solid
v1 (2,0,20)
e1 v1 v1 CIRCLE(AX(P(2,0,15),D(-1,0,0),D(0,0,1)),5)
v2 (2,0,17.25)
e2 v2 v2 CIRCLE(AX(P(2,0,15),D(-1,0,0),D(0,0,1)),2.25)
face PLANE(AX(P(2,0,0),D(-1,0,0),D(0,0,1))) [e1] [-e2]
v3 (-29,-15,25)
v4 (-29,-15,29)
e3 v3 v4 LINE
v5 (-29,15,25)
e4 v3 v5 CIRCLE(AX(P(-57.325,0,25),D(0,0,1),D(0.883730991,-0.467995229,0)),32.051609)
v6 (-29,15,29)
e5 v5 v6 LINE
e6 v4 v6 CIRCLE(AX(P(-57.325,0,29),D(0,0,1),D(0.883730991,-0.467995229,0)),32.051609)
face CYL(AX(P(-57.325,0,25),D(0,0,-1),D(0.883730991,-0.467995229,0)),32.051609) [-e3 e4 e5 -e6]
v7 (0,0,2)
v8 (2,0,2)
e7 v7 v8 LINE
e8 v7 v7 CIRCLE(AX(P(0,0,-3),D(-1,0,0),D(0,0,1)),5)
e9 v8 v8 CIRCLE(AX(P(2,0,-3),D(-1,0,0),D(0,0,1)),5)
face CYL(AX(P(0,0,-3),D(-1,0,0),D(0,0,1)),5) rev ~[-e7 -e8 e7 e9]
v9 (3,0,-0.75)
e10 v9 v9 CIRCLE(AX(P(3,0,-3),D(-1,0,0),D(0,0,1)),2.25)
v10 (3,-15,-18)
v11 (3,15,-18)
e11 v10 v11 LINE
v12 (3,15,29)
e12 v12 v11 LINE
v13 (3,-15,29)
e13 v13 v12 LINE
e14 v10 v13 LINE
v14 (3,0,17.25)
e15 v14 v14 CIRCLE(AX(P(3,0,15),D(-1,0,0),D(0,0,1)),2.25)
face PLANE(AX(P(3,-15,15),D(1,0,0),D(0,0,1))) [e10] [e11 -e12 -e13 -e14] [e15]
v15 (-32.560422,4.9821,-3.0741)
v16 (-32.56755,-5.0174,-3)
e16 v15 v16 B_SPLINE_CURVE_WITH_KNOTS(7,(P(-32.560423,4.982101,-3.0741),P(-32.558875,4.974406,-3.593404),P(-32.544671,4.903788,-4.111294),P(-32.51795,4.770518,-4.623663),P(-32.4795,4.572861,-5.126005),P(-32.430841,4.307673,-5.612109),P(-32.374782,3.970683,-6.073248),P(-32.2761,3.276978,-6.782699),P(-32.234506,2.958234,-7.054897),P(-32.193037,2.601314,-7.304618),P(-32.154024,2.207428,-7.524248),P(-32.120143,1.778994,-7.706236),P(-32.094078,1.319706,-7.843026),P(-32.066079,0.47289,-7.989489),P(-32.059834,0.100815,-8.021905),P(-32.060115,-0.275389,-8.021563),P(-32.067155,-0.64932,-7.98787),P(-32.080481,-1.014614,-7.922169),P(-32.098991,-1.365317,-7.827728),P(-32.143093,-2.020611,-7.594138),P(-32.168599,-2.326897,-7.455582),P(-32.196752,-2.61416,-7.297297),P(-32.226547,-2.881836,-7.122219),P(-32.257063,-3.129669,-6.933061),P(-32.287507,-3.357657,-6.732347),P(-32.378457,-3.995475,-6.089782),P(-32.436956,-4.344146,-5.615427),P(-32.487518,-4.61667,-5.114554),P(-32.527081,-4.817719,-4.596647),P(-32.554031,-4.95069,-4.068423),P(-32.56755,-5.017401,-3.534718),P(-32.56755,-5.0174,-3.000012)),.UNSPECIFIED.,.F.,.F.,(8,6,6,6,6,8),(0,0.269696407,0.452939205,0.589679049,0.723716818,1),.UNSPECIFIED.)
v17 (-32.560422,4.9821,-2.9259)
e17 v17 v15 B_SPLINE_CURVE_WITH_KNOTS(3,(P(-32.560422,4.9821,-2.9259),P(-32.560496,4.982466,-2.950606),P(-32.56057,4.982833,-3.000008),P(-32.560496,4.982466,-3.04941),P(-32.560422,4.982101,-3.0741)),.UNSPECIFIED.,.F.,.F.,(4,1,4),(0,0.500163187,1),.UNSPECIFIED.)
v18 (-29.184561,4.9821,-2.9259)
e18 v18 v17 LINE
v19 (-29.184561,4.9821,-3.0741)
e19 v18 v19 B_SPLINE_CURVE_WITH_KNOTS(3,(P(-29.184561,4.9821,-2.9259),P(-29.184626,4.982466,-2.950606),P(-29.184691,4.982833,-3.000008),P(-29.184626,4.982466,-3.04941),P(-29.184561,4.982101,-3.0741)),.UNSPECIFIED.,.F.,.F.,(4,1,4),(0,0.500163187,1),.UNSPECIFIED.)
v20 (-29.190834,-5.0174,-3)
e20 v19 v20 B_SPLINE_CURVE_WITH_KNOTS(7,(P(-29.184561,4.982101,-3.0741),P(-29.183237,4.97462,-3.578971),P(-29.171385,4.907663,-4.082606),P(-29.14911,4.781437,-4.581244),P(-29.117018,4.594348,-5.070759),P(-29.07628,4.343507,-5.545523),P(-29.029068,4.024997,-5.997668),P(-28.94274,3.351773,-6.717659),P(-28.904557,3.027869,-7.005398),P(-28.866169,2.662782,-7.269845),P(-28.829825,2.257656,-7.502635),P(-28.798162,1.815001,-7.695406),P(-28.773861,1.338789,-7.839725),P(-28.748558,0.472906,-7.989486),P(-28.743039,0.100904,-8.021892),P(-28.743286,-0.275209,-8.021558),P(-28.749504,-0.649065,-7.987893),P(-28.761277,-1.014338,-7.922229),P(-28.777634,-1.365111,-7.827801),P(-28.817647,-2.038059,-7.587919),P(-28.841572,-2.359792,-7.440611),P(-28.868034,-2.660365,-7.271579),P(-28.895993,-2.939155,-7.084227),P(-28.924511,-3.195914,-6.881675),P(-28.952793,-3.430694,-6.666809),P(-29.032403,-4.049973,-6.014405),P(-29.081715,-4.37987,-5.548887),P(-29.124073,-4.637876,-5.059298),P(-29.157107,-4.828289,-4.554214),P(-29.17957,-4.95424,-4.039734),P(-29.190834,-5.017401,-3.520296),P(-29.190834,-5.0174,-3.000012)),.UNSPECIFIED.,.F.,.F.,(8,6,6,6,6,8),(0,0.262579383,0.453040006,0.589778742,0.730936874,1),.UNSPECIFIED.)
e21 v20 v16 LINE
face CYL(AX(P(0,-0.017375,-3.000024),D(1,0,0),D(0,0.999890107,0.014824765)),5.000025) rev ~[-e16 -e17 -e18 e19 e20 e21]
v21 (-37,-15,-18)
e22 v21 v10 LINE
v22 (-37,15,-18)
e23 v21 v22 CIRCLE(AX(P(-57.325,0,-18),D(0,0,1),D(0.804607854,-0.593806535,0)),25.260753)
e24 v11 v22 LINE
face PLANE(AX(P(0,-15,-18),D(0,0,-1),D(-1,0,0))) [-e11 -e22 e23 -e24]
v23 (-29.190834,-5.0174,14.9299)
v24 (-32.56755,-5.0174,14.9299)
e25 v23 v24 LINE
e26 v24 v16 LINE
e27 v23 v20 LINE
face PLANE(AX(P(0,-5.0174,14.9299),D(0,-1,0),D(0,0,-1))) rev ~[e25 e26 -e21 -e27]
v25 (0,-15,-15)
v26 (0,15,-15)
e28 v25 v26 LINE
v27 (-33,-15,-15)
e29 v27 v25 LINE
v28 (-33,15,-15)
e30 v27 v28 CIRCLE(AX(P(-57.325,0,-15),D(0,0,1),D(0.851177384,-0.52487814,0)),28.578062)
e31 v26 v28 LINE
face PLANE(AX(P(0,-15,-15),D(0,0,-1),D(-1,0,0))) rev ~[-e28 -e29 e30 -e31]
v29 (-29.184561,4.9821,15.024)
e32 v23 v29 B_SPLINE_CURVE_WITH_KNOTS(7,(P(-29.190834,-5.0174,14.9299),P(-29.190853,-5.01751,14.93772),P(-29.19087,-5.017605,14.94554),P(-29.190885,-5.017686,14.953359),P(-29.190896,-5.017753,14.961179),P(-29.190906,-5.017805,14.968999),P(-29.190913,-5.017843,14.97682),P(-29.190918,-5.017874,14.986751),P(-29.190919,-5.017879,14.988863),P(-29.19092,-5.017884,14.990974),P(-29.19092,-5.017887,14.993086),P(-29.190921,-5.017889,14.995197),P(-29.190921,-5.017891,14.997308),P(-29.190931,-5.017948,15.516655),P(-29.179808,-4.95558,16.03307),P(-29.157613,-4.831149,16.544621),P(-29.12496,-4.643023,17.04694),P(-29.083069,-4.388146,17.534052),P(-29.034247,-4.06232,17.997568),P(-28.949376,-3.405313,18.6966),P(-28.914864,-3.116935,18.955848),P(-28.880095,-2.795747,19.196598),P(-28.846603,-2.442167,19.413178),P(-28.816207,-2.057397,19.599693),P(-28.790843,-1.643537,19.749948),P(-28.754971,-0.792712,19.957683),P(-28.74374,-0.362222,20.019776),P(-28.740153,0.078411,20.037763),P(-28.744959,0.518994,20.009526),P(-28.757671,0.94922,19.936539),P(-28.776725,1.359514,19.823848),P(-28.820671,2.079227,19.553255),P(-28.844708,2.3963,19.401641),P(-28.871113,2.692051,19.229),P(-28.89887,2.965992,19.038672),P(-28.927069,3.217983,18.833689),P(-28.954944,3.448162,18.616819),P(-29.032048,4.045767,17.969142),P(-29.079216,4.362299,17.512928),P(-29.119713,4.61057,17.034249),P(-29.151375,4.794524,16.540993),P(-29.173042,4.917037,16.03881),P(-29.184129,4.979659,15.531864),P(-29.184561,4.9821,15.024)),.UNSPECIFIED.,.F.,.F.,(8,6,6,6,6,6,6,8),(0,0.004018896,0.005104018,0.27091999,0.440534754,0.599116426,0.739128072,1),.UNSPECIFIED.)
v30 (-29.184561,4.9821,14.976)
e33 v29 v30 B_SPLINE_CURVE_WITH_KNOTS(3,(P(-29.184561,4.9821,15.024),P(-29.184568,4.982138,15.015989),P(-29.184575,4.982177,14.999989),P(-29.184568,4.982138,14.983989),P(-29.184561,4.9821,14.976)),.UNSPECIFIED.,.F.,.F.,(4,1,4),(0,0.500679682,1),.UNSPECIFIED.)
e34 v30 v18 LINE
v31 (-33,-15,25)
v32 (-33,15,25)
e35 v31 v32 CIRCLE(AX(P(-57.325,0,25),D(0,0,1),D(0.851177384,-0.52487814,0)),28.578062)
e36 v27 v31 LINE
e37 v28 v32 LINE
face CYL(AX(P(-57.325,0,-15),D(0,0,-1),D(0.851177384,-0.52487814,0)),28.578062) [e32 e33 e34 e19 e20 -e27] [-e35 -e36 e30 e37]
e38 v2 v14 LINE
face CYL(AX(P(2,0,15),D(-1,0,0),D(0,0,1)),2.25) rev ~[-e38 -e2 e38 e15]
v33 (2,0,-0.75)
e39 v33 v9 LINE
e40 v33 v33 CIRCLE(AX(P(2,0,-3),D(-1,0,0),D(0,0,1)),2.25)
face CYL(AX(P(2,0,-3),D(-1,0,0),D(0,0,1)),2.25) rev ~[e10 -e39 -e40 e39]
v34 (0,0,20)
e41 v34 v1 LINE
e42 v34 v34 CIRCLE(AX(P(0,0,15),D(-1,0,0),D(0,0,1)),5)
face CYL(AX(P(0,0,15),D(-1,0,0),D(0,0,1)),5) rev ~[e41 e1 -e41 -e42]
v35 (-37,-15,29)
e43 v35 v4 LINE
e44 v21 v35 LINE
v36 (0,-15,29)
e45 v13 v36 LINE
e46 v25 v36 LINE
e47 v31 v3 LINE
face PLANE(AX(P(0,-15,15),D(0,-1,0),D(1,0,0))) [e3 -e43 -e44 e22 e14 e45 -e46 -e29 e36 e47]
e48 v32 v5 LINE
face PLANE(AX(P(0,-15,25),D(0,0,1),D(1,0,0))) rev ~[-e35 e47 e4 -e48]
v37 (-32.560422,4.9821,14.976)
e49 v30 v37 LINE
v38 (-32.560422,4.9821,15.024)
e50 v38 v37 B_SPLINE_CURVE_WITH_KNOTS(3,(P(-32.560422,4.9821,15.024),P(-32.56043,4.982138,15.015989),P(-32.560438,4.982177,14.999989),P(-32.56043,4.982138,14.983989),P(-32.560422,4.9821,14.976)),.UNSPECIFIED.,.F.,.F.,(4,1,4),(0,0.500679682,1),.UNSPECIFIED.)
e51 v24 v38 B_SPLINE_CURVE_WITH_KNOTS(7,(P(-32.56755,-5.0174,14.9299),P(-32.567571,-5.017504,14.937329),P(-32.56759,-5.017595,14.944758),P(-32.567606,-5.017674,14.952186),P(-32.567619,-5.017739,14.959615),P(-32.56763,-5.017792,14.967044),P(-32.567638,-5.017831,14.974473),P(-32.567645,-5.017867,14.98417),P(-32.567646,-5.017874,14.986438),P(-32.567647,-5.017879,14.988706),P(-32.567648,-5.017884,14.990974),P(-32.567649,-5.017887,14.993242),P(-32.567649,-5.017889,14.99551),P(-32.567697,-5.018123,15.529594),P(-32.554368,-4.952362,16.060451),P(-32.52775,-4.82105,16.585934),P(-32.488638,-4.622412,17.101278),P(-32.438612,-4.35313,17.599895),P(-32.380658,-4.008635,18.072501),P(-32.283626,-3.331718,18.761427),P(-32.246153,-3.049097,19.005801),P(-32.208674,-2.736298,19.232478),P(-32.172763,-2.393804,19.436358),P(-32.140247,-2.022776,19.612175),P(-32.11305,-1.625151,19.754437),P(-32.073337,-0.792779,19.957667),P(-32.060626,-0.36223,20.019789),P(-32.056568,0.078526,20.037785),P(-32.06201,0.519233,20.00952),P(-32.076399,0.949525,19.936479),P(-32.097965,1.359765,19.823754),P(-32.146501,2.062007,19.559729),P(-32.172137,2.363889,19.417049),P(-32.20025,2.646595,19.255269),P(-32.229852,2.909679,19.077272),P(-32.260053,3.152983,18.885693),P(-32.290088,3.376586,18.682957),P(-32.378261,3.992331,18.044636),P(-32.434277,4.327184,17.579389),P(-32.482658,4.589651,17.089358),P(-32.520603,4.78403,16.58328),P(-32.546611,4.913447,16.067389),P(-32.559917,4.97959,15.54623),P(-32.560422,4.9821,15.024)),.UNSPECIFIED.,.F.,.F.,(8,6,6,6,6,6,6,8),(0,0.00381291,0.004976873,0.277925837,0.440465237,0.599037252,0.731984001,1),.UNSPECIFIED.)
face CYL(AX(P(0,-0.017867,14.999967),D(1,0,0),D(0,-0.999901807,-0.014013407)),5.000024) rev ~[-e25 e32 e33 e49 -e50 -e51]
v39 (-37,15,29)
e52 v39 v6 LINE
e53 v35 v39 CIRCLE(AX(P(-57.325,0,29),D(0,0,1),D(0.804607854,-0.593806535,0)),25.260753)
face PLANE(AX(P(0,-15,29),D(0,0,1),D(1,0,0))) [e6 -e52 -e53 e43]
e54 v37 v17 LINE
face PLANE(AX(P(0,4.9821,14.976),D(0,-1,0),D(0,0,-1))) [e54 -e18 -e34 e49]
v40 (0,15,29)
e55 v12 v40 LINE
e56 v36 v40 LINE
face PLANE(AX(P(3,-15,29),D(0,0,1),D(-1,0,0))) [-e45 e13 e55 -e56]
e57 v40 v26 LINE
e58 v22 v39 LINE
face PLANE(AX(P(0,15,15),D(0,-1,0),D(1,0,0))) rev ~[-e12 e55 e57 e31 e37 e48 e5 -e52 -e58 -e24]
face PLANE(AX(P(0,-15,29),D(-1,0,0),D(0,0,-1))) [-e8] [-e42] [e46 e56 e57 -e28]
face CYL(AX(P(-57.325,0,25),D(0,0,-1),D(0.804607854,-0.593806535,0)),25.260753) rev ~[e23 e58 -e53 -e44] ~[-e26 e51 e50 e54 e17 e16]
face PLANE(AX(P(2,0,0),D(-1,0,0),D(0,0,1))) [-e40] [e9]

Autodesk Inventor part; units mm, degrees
ref_plane "YZ Plane" through (0, 0, 0) normal (1, 0, 0) x (0, 1, 0)
ref_plane "XZ Plane" through (0, 0, 0) normal (0, 1, 0) x (-1, 0, 0)
ref_plane "XY Plane" through (0, 0, 0) normal (0, 0, 1) x (1, 0, 0)
sketch "Sketch1" plane through (0, 0, 0) normal (1, 0, 0) x (0, 1, 0)
  line L0 (-15, -15) -> (15, -15)
  line L1 (15, -15) -> (15, 15)
  line L2 (15, 15) -> (-15, 15)
  line L3 (-15, 15) -> (-15, -15)
  line L4 (-15, -15) -> (15, 15) construction
  line L5 (15, -15) -> (-15, 15) construction
  point P0 (0, 0)
  dimension "d0" = 30
  dimension "d1" = 30
extrude "Extrusion1" add sketch "Sketch1" along normal blind 3
sketch "Sketch2" plane through (0, -15, -15) normal (0, 0, -1) x (-1, 0, 0)
  line L0 (0, 30) -> (-3, 30) projected
  line L1 (-3, 30) -> (37, 30)
  line L2 (37, 30) -> (37, 0)
  line L3 (37, 0) -> (-3, 0)
  line L4 (-3, 0) -> (-3, 30)
  point P0 (0, 15)
  dimension "d4" = 40
  dimension "d5" = 30
extrude "Extrusion2" add sketch "Sketch2" along normal blind 3
sketch "Sketch3" plane through (0, -15, -15) normal (0, 0, 1) x (1, 0, 0)
  line L0 (0, 0) -> (-37, 0) projected
  line L1 (-37, 0) -> (-37, 30) projected
  arc A0 (-37, 0) -> (-37, 30) centre (-57.325, 15) ccw
  point P0 (0, 15)
extrude "Extrusion3" cut sketch "Sketch3" against normal blind 3
sketch "Sketch4" plane through (0, -15, -15) normal (0, 0, 1) x (1, 0, 0)
  line L0 (-37, 30) -> (0, 30) projected
  arc A0 (-37, 0) -> (-37, 30) centre (-57.325, 15) ccw projected
  line L1 (-33.6755, 30) -> (-37, 30)
  point P0 (0, 15)
sketch "Sketch5" plane through (0, -15, -15) normal (0, 0, 1) x (1, 0, 0)
  arc A0 (-37, 0) -> (-37, 30) centre (-57.325, 15) ccw projected
  line L0 (-37, 30) -> (-33, 30)
  line L1 (-37, 30) -> (0, 30) projected
  line L2 (0, 0) -> (-37, 0) projected
  arc A1 (-33, 0) -> (-33, 30) centre (-57.325, 15) ccw
  line L3 (-33, 0) -> (-37, 0)
  arc A2 (-37, 0) -> (-37, 30) centre (-57.325, 15) ccw
  point P0 (0, 15)
  dimension "d10" = 4
extrude "Extrusion4" add sketch "Sketch5" along normal blind 40
sketch "Sketch6" plane through (0, -15, 25) normal (0, 0, 1) x (1, 0, 0)
  line L0 (-33, 30) -> (-37, 30) projected
  line L1 (-37, 30) -> (-29, 30)
  arc A0 (-37, 0) -> (-37, 30) centre (-57.325, 15) ccw projected
  line L2 (-37, 0) -> (-29, 0)
  arc A1 (-29, 0) -> (-29, 30) centre (-57.325, 15) ccw
  arc A2 (-37, 0) -> (-37, 30) centre (-57.325, 15) ccw
  point P0 (0, 15)
  dimension "d13" = 8
extrude "Extrusion5" add sketch "Sketch6" along normal blind 4
sketch "Sketch7" plane through (0, -15, 15) normal (0, -1, 0) x (1, 0, 0)
  point P0 (0, -15)
sketch "Sketch8" plane through (0, -15, 15) normal (0, 0, 1) x (1, 0, 0)
  point P0 (0, 15)
sketch "Sketch9" plane through (0, -15, 15) normal (0, -1, 0) x (1, 0, 0)
  line L0 (3, 0) -> (3, -33) projected
  line L1 (3, 0) -> (3, 14)
  line L2 (3, 14) -> (0, 14)
  line L3 (0, 0) -> (3, 0) projected
  line L4 (0, 14) -> (0, 0)
  line L5 (0, 0) -> (3, 0)
  point P0 (0, -15)
  dimension "d16" = 14
extrude "Extrusion6" add sketch "Sketch9" against normal blind 30
sketch "Sketch10" plane through (0, 0, 0) normal (-1, 0, 0) x (0, 0, 1)
  point P0 (0, 0)
sketch "Sketch11" plane through (0, 0, 0) normal (-1, 0, 0) x (0, 0, 1)
  arc A0 (14.9299, -5.0174) -> (14.976, 4.9821) centre (15, -0.0179) ccw
  arc A1 (-2.9259, 4.9821) -> (-3, -5.0174) centre (-3, -0.0174) ccw
  line L0 (-15, -15) -> (-15, 15) projected
  line L1 (29, -15) -> (29, 15) projected
  line L2 (14.9299, -5.0174) -> (-3, -5.0174)
  line L3 (15.024, 4.9821) -> (-3.0741, 4.9821)
  line L4 (29, -15) -> (-15, -15) projected
  line L5 (-15, 15) -> (29, 15) projected
  point P0 (0, 0)
  point P1 (-15, 0)
  point P2 (29, 0)
  dimension "d19" = 10
  dimension "d20" = 10
  dimension "d21" = 12
  dimension "d22" = 14
extrude "Extrusion7" cut sketch "Sketch11" along normal blind 50 contours L2 A1 L3 A0
sketch "Sketch12" plane through (0, 0, 0) normal (-1, 0, 0) x (0, 0, 1)
  circle A0 centre (-3, 0) radius 5
  circle A1 centre (15, 0) radius 5
  line L0 (29, -15) -> (29, 15) projected
  line L1 (-15, -15) -> (-15, 15) projected
  point P0 (0, 0)
  point P1 (29, 0)
  point P2 (-15, 0)
  dimension "d25" = 10
  dimension "d26" = 10
  dimension "d27" = 14
  dimension "d28" = 12
extrude "Extrusion8" cut sketch "Sketch12" against normal blind 2
sketch "Sketch13" plane through (2, 0, 15) normal (-1, 0, 0) x (0, 0, 1)
  circle A0 centre (0, 0) radius 2.25
  circle A1 centre (-18, 0) radius 2.25
  circle A2 centre (-18, 0) radius 5 projected
  point P0 (-15, 0)
  dimension "d31" = 4.5
  dimension "d32" = 4.5
  dimension "d33" = 2.75
extrude "Extrusion9" cut sketch "Sketch13" against normal blind 3 contours A0 | A1
sketch "Sketch14" plane through (3, 0, 0) normal (1, 0, 0) x (0, 0, -1)
  line L0 (-29, 15) -> (18, 15) projected
  line L1 (-29, -15) -> (18, -15) projected
  line L2 (-29, 15) -> (18, 15)
  line L3 (18, 15) -> (18, -15)
  line L4 (18, -15) -> (-29, -15)
  line L5 (-29, -15) -> (-29, 15)
  circle A0 centre (3, 0) radius 2.25 projected
  circle A1 centre (3, 0) radius 5
  circle A2 centre (-15, 0) radius 5 projected
  circle A3 centre (-15, 0) radius 5
  point P0 (0, 0)
properties part number "headphones_hook1.1"
